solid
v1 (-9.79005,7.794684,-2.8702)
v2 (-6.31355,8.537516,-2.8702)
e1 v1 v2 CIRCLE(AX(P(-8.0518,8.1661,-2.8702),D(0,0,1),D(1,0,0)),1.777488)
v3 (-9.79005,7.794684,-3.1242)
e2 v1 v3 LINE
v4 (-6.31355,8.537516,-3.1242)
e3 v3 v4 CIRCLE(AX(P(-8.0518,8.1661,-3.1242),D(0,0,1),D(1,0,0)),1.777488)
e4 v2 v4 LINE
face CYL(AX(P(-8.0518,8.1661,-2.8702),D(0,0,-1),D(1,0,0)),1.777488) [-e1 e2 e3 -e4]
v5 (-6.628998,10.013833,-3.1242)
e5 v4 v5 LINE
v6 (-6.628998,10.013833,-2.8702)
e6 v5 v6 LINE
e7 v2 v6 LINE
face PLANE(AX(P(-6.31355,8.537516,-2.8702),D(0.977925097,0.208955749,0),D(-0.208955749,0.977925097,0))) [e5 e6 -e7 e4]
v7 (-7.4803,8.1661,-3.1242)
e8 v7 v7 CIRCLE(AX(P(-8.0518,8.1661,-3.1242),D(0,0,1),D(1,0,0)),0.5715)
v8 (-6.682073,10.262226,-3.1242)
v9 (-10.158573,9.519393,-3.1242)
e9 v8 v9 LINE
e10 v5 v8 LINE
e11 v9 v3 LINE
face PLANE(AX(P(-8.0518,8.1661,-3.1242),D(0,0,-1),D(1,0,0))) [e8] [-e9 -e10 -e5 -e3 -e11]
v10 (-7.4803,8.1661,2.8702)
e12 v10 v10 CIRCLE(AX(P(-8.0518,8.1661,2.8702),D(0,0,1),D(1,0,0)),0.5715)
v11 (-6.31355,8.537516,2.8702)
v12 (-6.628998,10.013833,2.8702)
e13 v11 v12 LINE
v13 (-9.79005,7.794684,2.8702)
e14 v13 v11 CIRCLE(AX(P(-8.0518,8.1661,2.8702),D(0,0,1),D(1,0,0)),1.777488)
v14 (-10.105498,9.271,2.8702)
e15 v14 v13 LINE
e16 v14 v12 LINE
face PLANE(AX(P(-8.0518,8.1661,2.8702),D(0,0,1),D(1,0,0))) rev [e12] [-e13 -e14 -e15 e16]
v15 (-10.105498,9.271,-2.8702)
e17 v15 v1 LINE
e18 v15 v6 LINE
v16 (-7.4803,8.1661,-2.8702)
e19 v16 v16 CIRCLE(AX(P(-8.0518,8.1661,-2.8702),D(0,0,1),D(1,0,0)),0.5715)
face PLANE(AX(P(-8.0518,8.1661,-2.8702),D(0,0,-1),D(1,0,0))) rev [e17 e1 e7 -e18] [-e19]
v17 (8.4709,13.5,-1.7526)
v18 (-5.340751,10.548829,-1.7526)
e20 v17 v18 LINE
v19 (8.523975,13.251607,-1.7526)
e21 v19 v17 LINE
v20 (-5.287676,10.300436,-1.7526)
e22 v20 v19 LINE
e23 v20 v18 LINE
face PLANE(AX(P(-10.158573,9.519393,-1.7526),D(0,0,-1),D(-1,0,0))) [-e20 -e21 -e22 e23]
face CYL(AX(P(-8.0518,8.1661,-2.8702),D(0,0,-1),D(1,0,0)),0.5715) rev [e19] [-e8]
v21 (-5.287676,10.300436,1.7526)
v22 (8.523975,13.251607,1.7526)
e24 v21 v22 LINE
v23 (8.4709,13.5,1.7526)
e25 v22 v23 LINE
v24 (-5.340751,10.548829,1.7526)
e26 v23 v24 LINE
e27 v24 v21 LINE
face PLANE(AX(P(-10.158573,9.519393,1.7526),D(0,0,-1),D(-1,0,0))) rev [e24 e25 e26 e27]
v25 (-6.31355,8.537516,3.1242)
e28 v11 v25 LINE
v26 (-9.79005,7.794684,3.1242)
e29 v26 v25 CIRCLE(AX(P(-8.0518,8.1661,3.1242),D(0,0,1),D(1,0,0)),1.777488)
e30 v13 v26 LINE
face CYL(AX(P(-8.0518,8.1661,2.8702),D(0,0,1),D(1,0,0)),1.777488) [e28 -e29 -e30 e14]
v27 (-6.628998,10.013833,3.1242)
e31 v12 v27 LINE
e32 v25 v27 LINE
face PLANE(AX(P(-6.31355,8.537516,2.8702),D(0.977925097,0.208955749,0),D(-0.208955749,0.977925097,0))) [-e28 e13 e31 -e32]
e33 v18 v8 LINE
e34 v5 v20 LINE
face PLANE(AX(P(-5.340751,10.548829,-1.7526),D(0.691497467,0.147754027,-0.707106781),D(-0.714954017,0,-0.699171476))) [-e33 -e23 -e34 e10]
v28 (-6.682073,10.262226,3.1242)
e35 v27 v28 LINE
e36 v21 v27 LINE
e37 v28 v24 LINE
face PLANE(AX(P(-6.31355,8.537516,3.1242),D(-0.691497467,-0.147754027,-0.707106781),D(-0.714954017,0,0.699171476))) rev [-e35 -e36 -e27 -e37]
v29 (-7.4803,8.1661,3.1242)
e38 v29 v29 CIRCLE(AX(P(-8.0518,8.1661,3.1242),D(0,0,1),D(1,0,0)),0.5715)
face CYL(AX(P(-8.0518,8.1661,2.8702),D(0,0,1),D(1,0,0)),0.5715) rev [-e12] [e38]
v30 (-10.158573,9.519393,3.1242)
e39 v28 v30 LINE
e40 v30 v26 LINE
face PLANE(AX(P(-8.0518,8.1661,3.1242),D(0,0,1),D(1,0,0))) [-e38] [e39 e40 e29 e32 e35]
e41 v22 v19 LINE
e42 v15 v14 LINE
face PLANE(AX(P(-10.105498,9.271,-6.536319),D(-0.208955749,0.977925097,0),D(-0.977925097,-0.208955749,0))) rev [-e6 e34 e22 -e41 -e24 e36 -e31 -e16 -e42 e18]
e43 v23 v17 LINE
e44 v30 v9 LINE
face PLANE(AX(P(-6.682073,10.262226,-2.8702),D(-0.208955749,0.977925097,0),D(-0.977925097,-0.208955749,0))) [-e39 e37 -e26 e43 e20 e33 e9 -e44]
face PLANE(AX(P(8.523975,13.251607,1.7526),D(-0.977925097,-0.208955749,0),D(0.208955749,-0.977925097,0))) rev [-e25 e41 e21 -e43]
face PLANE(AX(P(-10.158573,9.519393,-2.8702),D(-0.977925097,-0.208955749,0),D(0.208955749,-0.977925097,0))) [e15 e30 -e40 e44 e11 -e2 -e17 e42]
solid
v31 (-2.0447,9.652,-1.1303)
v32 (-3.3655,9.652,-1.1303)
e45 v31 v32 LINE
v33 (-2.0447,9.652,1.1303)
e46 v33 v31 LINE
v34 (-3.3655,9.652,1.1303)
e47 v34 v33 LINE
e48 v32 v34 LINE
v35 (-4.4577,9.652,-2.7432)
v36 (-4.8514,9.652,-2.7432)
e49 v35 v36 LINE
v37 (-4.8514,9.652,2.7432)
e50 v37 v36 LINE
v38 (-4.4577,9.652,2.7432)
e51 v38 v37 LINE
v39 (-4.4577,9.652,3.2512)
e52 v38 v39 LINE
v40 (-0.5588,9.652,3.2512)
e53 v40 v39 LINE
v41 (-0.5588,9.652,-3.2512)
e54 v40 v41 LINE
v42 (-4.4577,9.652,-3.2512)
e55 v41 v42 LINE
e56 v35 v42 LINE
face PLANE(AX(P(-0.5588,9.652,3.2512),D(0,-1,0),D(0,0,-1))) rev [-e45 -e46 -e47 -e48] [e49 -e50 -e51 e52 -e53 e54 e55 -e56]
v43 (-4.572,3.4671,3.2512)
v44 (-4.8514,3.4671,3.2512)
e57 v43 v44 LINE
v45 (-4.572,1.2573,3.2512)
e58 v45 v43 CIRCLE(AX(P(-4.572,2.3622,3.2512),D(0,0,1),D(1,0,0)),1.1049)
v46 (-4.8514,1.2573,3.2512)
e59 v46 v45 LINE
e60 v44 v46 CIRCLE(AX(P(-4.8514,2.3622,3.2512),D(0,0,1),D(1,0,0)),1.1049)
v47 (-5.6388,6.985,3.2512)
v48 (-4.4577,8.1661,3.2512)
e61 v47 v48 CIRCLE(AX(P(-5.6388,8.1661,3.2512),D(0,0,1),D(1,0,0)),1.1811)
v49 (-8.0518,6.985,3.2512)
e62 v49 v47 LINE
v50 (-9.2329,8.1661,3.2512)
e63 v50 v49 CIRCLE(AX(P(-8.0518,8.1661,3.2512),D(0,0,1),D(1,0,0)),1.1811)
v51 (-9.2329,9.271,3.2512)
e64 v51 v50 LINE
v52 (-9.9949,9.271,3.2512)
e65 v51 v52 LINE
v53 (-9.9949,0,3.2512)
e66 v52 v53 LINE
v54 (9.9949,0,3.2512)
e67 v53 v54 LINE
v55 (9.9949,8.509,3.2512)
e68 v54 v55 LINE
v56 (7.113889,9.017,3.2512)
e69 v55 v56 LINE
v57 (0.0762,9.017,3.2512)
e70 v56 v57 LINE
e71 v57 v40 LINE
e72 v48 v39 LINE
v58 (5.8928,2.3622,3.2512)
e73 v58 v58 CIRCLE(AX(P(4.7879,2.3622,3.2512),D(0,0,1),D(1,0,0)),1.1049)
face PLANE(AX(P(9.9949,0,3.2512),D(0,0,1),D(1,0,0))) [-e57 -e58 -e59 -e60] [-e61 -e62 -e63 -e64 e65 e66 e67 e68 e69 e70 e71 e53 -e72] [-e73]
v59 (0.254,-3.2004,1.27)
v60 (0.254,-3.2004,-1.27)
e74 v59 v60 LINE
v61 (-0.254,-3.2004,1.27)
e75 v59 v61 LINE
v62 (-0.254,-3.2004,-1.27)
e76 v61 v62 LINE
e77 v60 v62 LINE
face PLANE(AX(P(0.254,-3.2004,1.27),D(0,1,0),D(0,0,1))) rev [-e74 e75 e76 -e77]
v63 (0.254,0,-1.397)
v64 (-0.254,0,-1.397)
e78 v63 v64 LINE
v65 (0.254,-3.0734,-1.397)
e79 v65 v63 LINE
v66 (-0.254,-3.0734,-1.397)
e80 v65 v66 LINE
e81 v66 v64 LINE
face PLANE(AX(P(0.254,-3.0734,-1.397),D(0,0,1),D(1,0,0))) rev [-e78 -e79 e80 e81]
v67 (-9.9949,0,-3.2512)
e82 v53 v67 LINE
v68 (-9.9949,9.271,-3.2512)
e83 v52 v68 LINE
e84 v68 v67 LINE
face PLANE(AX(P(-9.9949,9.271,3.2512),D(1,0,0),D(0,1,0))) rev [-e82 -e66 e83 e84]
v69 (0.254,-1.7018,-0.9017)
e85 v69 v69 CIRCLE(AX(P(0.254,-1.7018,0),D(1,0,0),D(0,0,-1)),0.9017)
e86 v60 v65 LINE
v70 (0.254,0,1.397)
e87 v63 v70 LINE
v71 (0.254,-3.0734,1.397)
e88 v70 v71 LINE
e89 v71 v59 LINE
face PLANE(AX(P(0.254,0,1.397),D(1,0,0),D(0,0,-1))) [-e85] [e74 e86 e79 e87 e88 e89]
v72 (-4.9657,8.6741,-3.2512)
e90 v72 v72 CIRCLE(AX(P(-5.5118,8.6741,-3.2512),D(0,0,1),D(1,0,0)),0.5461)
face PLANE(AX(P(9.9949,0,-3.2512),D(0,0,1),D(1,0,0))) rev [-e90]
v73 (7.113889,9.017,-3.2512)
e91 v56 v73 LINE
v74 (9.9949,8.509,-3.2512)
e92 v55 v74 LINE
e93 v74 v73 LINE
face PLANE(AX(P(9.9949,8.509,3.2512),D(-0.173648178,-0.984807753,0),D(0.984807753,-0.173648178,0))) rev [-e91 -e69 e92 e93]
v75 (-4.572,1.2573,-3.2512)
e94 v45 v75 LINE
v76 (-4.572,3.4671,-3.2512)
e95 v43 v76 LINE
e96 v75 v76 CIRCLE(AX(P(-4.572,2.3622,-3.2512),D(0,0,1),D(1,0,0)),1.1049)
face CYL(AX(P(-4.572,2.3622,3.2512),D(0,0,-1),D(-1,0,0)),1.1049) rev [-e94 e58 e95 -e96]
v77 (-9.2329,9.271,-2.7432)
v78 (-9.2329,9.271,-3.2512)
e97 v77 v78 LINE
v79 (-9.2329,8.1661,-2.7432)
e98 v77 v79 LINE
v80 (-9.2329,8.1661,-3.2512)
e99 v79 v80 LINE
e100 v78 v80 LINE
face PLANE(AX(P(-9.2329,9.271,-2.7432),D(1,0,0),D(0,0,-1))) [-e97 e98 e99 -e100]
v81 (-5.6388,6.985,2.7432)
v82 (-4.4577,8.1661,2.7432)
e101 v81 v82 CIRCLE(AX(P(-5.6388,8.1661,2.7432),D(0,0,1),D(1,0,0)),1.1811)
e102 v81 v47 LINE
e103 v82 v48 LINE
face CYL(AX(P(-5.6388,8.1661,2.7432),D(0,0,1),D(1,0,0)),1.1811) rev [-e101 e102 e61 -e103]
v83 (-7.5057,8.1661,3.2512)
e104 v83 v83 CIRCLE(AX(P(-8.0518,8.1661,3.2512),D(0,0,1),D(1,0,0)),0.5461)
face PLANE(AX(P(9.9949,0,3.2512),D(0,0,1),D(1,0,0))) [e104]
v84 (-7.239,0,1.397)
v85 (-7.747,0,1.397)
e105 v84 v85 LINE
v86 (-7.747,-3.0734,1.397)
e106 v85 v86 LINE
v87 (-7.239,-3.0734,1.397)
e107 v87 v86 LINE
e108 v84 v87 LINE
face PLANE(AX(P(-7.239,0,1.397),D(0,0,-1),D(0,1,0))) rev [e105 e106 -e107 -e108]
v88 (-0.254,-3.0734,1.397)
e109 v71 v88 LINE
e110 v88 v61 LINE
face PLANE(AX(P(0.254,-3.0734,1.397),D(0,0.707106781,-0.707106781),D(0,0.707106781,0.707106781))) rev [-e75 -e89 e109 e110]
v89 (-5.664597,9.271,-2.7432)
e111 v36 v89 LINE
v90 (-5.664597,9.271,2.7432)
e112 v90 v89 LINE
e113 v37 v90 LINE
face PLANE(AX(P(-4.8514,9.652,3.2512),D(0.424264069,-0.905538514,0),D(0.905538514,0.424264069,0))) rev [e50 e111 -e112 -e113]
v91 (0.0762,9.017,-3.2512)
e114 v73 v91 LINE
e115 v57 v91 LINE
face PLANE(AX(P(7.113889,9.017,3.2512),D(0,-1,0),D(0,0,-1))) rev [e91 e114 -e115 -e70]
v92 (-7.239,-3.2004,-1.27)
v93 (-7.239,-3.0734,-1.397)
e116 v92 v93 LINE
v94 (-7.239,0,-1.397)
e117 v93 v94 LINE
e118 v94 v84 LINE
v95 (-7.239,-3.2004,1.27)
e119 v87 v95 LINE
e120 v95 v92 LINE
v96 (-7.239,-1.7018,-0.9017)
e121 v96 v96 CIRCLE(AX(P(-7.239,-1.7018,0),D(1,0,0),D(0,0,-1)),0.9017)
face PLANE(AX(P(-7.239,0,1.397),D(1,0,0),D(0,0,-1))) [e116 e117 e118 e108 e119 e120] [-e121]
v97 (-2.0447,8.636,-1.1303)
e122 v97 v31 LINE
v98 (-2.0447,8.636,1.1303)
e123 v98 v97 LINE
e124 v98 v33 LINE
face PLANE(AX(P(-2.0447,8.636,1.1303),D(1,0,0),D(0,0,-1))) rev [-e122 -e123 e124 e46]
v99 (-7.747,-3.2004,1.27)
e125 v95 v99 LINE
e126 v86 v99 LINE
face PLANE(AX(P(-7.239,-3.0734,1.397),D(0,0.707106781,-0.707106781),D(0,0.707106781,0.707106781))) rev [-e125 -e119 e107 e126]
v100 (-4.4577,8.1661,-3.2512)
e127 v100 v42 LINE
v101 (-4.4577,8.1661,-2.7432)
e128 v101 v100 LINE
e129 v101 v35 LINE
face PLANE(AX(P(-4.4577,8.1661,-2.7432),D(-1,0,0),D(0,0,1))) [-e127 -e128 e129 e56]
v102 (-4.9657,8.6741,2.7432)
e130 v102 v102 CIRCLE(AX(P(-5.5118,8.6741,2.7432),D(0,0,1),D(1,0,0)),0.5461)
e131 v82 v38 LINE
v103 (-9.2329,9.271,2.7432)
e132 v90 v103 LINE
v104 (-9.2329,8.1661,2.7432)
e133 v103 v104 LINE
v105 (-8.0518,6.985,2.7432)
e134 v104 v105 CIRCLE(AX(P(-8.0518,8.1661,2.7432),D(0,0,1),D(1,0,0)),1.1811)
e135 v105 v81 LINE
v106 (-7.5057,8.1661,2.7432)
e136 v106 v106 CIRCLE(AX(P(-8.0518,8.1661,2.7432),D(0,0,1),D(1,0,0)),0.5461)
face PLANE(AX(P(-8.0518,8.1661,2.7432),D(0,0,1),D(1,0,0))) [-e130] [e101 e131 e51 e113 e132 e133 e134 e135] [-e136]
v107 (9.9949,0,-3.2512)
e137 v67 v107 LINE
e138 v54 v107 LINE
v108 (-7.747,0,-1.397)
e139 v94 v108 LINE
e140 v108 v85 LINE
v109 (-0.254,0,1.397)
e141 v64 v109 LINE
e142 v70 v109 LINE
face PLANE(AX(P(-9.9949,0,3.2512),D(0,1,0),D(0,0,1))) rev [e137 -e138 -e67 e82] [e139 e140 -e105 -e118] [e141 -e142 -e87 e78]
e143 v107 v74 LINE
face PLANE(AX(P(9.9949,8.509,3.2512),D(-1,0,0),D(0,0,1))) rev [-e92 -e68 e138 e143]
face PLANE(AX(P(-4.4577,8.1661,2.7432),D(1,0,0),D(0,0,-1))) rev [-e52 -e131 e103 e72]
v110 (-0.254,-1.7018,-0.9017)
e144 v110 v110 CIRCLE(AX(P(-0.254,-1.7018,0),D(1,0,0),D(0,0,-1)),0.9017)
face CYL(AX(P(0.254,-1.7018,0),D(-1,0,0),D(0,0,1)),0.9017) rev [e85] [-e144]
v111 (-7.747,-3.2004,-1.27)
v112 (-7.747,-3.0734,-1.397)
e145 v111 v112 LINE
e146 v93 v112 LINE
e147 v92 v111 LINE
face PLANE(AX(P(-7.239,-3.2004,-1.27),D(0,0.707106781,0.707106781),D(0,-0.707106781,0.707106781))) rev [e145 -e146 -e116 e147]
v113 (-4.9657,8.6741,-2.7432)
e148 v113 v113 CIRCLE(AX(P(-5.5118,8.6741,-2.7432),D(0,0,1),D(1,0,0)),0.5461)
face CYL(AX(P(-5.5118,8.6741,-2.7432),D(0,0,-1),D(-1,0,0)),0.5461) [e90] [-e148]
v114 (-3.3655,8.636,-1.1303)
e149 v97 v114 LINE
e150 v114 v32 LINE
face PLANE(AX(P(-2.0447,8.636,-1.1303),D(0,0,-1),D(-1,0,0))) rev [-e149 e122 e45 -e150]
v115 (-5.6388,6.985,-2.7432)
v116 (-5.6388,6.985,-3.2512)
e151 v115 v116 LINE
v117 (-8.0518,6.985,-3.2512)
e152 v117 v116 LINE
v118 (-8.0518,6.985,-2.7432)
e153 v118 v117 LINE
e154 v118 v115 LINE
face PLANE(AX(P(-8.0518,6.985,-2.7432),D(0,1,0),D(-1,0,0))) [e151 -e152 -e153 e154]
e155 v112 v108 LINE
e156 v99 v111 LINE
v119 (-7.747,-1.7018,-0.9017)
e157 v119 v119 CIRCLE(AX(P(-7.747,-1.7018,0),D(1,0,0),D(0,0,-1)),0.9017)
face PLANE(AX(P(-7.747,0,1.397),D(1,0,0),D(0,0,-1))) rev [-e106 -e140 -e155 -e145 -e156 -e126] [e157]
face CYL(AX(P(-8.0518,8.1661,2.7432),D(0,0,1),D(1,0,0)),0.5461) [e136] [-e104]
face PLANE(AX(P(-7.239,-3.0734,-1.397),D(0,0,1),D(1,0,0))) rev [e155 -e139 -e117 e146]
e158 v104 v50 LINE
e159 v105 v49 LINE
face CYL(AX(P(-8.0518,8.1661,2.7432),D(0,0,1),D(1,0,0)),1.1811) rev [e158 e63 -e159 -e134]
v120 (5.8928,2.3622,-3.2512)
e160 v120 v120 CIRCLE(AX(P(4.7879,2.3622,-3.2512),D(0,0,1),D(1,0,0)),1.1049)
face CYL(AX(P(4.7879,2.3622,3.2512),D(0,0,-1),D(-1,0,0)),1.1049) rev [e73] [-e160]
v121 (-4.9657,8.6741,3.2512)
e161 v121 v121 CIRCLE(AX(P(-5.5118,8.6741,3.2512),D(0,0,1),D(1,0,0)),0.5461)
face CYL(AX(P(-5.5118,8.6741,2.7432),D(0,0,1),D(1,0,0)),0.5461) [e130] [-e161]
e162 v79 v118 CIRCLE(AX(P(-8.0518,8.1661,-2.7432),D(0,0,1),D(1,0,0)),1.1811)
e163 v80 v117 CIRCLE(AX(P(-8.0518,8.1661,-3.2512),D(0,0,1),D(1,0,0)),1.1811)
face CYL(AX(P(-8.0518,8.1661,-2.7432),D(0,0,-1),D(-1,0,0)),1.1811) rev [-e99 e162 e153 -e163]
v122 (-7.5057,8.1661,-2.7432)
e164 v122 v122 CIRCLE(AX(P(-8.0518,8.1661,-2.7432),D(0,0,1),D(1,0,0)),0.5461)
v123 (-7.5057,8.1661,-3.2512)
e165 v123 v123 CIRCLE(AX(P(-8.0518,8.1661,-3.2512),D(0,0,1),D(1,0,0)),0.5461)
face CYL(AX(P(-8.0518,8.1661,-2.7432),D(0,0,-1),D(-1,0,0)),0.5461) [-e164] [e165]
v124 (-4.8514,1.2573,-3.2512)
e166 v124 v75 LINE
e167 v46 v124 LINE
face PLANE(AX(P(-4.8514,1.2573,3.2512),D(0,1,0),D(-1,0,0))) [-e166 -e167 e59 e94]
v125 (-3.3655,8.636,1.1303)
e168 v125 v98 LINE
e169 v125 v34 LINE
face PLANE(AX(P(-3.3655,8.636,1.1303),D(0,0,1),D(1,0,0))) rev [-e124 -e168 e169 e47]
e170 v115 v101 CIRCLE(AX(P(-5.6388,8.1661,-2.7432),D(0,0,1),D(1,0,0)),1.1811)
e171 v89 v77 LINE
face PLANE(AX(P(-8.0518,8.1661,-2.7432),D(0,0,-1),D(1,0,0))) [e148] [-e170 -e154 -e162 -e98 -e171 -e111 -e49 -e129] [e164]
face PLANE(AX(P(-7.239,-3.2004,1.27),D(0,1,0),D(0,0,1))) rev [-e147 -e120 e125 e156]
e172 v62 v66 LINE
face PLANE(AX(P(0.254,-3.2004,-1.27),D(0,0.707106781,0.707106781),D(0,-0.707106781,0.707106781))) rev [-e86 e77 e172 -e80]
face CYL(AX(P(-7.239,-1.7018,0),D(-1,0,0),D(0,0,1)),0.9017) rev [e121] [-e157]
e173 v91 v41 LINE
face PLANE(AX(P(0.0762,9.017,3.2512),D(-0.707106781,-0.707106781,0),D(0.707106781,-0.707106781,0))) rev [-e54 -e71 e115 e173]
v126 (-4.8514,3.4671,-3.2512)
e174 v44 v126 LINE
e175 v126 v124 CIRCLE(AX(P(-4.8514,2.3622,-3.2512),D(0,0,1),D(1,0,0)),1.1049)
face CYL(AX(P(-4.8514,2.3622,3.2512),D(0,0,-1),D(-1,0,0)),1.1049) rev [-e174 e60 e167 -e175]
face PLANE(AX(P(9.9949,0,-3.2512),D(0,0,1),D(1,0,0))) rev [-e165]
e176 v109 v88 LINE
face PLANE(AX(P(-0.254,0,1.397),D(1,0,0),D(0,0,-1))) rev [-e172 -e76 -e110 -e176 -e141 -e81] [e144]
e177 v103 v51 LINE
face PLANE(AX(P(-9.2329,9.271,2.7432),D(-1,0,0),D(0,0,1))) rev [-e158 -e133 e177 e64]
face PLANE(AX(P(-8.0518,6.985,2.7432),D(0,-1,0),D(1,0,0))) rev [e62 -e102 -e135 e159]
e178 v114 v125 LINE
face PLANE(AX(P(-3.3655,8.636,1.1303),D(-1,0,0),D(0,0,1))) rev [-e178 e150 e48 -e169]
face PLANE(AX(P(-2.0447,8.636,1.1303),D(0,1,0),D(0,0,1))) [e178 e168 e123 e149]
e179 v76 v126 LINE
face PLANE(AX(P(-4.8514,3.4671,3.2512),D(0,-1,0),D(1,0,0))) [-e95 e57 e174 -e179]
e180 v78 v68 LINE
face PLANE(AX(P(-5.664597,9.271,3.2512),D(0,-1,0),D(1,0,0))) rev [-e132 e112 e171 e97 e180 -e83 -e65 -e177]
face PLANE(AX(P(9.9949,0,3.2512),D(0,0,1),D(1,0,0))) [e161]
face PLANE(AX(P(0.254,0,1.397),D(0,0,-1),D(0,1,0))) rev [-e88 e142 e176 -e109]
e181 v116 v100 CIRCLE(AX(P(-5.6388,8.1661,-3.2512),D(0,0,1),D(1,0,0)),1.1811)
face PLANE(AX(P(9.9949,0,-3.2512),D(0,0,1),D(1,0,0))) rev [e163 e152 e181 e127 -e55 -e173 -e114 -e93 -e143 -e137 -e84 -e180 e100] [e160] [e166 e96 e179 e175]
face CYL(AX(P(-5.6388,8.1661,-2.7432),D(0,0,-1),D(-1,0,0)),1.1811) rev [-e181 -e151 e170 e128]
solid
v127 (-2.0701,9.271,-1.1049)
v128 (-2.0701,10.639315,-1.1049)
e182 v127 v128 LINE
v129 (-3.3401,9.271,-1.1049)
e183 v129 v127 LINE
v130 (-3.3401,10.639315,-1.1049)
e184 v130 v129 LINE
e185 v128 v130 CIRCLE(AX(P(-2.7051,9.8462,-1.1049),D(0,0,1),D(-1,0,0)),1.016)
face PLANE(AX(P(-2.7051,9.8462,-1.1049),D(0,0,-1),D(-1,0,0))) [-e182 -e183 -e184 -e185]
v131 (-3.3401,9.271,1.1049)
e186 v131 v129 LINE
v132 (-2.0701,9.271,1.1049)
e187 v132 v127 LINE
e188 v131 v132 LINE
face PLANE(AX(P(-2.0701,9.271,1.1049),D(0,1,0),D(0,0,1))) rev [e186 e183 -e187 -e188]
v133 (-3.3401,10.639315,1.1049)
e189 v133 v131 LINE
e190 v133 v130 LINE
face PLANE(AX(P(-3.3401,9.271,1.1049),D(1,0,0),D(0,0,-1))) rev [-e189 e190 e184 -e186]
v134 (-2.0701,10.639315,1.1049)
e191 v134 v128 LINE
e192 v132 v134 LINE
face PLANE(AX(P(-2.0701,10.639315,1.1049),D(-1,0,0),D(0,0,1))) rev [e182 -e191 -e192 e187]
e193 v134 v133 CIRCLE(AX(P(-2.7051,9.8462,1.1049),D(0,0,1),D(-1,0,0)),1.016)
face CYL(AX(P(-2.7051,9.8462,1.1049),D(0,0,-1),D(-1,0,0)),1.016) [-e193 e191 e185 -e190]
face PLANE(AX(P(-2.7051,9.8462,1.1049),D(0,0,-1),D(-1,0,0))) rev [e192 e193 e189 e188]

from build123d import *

# Parameters (mm, degrees)
SKETCH2_R          = 1.1049
EXTRUDE1_DEPTH     = 3.2512
EXTRUDE2_DEPTH     = 1.1049
SKETCH4_W          = 1.3208
SKETCH4_H          = 2.2606
CUT_EXTRUDE1_DEPTH = 1.016
SKETCH5_R          = 0.5461
CUT_EXTRUDE2_DEPTH = 0.508
SKETCH10_R         = 0.9017
EXTRUDE6_DEPTH     = 0.254
LPATTERN1_COUNT    = 2
LPATTERN1_PITCH    = 7.493
EXTRUDE3_DEPTH     = 1.7526
EXTRUDE4_START     = -0.127
SKETCH8_R          = 0.5715
EXTRUDE4_DEPTH     = 0.254
EXTRUDE5_DEPTH     = 1.1176


with BuildPart() as part:
    # Sketch2 → Extrude1 (new, symmetric)
    with BuildSketch(Plane.XY):
        Polygon((9.9949, 8.509), (7.113888836, 9.017), (0.0762, 9.017), (-0.5588, 9.652), (-4.8514, 9.652), (-5.664596778, 9.271), (-9.9949, 9.271), (-9.9949, 0), (9.9949, 0), align=None)
        with Locations((4.7879, 2.3622)):
            Circle(SKETCH2_R, mode=Mode.SUBTRACT)
        with BuildLine():
            Line((-4.8514, 3.4671), (-4.572, 3.4671))
            ThreePointArc((-4.572, 3.4671), (-3.4671, 2.3622), (-4.572, 1.2573))
            Line((-4.572, 1.2573), (-4.8514, 1.2573))
            ThreePointArc((-4.8514, 1.2573), (-5.9563, 2.3622), (-4.8514, 3.4671))
        make_face(mode=Mode.SUBTRACT)
    extrude(amount=EXTRUDE1_DEPTH, both=True)

    # Sketch4 → Cut-Extrude1 (cut)
    with BuildSketch(Plane(origin=(0, 9.652, 0), x_dir=(-1, 0, 0), z_dir=(0, 1, 0))):
        with Locations((2.7051, 0)):
            Rectangle(SKETCH4_W, SKETCH4_H)
    extrude(amount=-CUT_EXTRUDE1_DEPTH, mode=Mode.SUBTRACT)

    # Sketch5 → Cut-Extrude2 (cut)
    with BuildSketch(Plane.XY.offset(3.2512)):
        with BuildLine():
            Line((-9.2329, 9.271), (-9.2329, 8.1661))
            ThreePointArc((-9.2329, 8.1661), (-8.886963819, 7.330936181), (-8.0518, 6.985))
            Line((-8.0518, 6.985), (-5.6388, 6.985))
            ThreePointArc((-5.6388, 6.985), (-4.803636181, 7.330936181), (-4.4577, 8.1661))
            Line((-4.4577, 8.1661), (-4.4577, 9.652))
            Line((-4.4577, 9.652), (-4.8514, 9.652))
            Line((-4.8514, 9.652), (-5.664596778, 9.271))
            Line((-5.664596778, 9.271), (-9.2329, 9.271))
        make_face()
        with Locations((-5.5118, 8.6741)):
            Circle(SKETCH5_R, mode=Mode.SUBTRACT)
        with Locations((-8.0518, 8.1661)):
            Circle(SKETCH5_R, mode=Mode.SUBTRACT)
    cut_extrude2 = extrude(amount=-CUT_EXTRUDE2_DEPTH, mode=Mode.SUBTRACT)

    # Mirror1: Cut-Extrude2 across plane
    add(cut_extrude2.mirror(Plane.XY), mode=Mode.SUBTRACT)

    # Sketch10 → Extrude6 (add, symmetric)
    with BuildSketch(Plane(origin=(-7.493, 0, 0), x_dir=(0, 0, -1), z_dir=(1, 0, 0))):
        Polygon((-1.397, 0), (-1.397, -3.0734), (-1.27, -3.2004), (1.27, -3.2004), (1.397, -3.0734), (1.397, 0), align=None)
        with Locations((0, -1.7018)):
            Circle(SKETCH10_R, mode=Mode.SUBTRACT)
    extrude6 = extrude(amount=EXTRUDE6_DEPTH, both=True)

    # LPattern1: Extrude6 ×2
    with Locations(*[(i * LPATTERN1_PITCH, 0, 0) for i in range(1, LPATTERN1_COUNT)]):
        add(extrude6)


with BuildPart() as body_2:
    # Sketch3 → Extrude2 (new, symmetric)
    with BuildSketch(Plane.XY):
        with BuildLine():
            Line((-3.3401, 9.271), (-3.3401, 10.639314746))
            ThreePointArc((-3.3401, 10.639314746), (-2.7051, 10.8622), (-2.0701, 10.639314746))
            Line((-2.0701, 10.639314746), (-2.0701, 9.271))
            Line((-2.0701, 9.271), (-3.3401, 9.271))
        make_face()
    extrude(amount=EXTRUDE2_DEPTH, both=True)


with BuildPart() as body_3:
    # Sketch6 → Extrude3 (new, symmetric)
    with BuildSketch(Plane.XY):
        Polygon((-10.105498332, 9.271), (8.52397476, 13.251607025), (8.4709, 13.5), (-10.158573093, 9.519392975), align=None)
    extrude(amount=EXTRUDE3_DEPTH, both=True)


with BuildPart() as body_4:
    # Sketch8 → Extrude4 (new body)
    with BuildSketch(Plane.XY.offset(3.2512).offset(EXTRUDE4_START)):
        with BuildLine():
            Line((-6.313549941, 8.537516323), (-6.682072975, 10.262225621))
            Line((-6.682072975, 10.262225621), (-10.158573093, 9.519392975))
            Line((-10.158573093, 9.519392975), (-9.790050059, 7.794683677))
            ThreePointArc((-9.790050059, 7.794683677), (-7.680383677, 6.427849941), (-6.313549941, 8.537516323))
        make_face()
        with Locations((-8.0518, 8.1661)):
            Circle(SKETCH8_R, mode=Mode.SUBTRACT)
    extrude(amount=-EXTRUDE4_DEPTH)

    # Sketch9 → Extrude5 (add)
    with BuildSketch(Plane.XY.offset(1.7526)):
        Polygon((-6.628998215, 10.013832646), (-6.682072975, 10.262225621), (-10.158573093, 9.519392975), (-10.105498332, 9.271), align=None)
    extrude(amount=EXTRUDE5_DEPTH)


with BuildPart() as body_5:
    # Mirror7: mirrored copy
    add(body_4.part.mirror(Plane.XY))

    # Combine1: union body 3, body 4
    add(body_3.part)
    add(body_4.part)

    # Chamfer1
    # the kernel refuses this chamfer: 1.3716 mm, written as the material it adds along each edge
    with BuildSketch(Plane(origin=(-6.628998215, 10.013832646, -1.7526), x_dir=(-0.02688890779397689, -0.005745421501653921, -0.9996219169112968), z_dir=(-0.20895574936649164, 0.9779250967260673, 0))) as chamfer1_piece_1_section:
        with BuildLine():
            Line((1.410928155, 0), (-0.077560078, -1.408794766))
            Line((-0.077560078, -1.408794766), (-0.104981706, -1.408040499))
            ThreePointArc((-0.104981706, -1.408040499), (-0.046811648, -0.704176463), (-0.027421628, 0.000754267))
            Line((-0.027421628, 0.000754267), (0.000754267, 0.027421628))
            ThreePointArc((0.000754267, 0.027421628), (0.705684997, 0.008031609), (1.411682421, 0.027421628))
            Line((1.411682421, 0.027421628), (1.410928155, 0))
        make_face()
    chamfer1_piece_1 = extrude(amount=0.254, mode=Mode.PRIVATE)
    chamfer1_piece_1 = split(chamfer1_piece_1, bisect_by=Plane(origin=(-6.605283049, 10.148766723, -2.8702), z_dir=(0, 0, -1)), keep=Keep.TOP, mode=Mode.PRIVATE)
    chamfer1_piece_1 = split(chamfer1_piece_1, bisect_by=Plane(origin=(-6.605283049, 10.148766723, -3.1242), z_dir=(0, 0, 1)), keep=Keep.TOP, mode=Mode.PRIVATE)
    add(chamfer1_piece_1)
    with BuildSketch(Plane(origin=(-5.891944341, 6.564377516, -1.7526), x_dir=(-0.026888907793975552, -0.005745421501653636, -0.9996219169112968), z_dir=(-0.20895574936649164, 0.9779250967260673, 0))) as chamfer1_piece_2_section:
        with BuildLine():
            Line((1.410928155, 0), (-0.077560078, -1.408794766))
            Line((-0.077560078, -1.408794766), (-0.104981706, -1.408040499))
            ThreePointArc((-0.104981706, -1.408040499), (-0.046811648, -0.704176463), (-0.027421628, 0.000754267))
            Line((-0.027421628, 0.000754267), (0.000754267, 0.027421628))
            ThreePointArc((0.000754267, 0.027421628), (0.705684997, 0.008031609), (1.411682421, 0.027421628))
            Line((1.411682421, 0.027421628), (1.410928155, 0))
        make_face()
    chamfer1_piece_2 = extrude(amount=3.781320386, mode=Mode.PRIVATE)
    chamfer1_piece_2 = split(chamfer1_piece_2, bisect_by=Plane(origin=(-6.345522767, 8.530684608, -2.8702), z_dir=(0, 0, -1)), keep=Keep.TOP, mode=Mode.PRIVATE)
    chamfer1_piece_2 = split(chamfer1_piece_2, bisect_by=Plane(origin=(-6.345522767, 8.530684608, -3.1242), z_dir=(0, 0, 1)), keep=Keep.TOP, mode=Mode.PRIVATE)
    chamfer1_piece_2 = chamfer1_piece_2 & Plane(origin=(-8.0518, 8.1661, -3.007575957), x_dir=(-0.9779250967260683, -0.20895574936648695, 0), z_dir=(0, 0, -1)) * Cylinder(1.777487933, 14, mode=Mode.PRIVATE)
    add(chamfer1_piece_2)
    with BuildSketch(Plane(origin=(-6.628998215, 10.013832646, -1.7526), x_dir=(-0.02688890779397689, -0.005745421501653921, -0.9996219169112968), z_dir=(-0.20895574936649164, 0.9779250967260673, 0))) as chamfer1_piece_3_section:
        with BuildLine():
            Line((1.410928155, 0), (-0.077560078, -1.408794766))
            Line((-0.077560078, -1.408794766), (-0.104981706, -1.408040499))
            ThreePointArc((-0.104981706, -1.408040499), (-0.046811648, -0.704176463), (-0.027421628, 0.000754267))
            Line((-0.027421628, 0.000754267), (0.000754267, 0.027421628))
            ThreePointArc((0.000754267, 0.027421628), (0.705684997, 0.008031609), (1.411682421, 0.027421628))
            Line((1.411682421, 0.027421628), (1.410928155, 0))
        make_face()
    chamfer1_piece_3 = extrude(amount=0.254, mode=Mode.PRIVATE)
    chamfer1_piece_3 = split(chamfer1_piece_3, bisect_by=Plane(origin=(-6.194081793, 10.236629144, -2.8702), z_dir=(0, 0, 1)), keep=Keep.TOP, mode=Mode.PRIVATE)
    add(chamfer1_piece_3)
    with BuildSketch(Plane(origin=(-6.628998215, 10.013832646, 1.7526), x_dir=(-0.02688890779397689, -0.005745421501653921, 0.9996219169112968), z_dir=(-0.2089557493664916, 0.9779250967260672, 0))) as chamfer1_piece_4_section:
        with BuildLine():
            Line((1.410928155, 0), (-0.077560078, 1.408794766))
            Line((-0.077560078, 1.408794766), (-0.104981706, 1.408040499))
            ThreePointArc((-0.104981706, 1.408040499), (-0.046811648, 0.704176463), (-0.027421628, -0.000754267))
            Line((-0.027421628, -0.000754267), (0.000754267, -0.027421628))
            ThreePointArc((0.000754267, -0.027421628), (0.705684997, -0.008031609), (1.411682421, -0.027421628))
            Line((1.411682421, -0.027421628), (1.410928155, 0))
        make_face()
    chamfer1_piece_4 = extrude(amount=0.254, mode=Mode.PRIVATE)
    chamfer1_piece_4 = split(chamfer1_piece_4, bisect_by=Plane(origin=(-6.605283049, 10.148766723, 2.8702), z_dir=(0, 0, 1)), keep=Keep.TOP, mode=Mode.PRIVATE)
    chamfer1_piece_4 = split(chamfer1_piece_4, bisect_by=Plane(origin=(-6.605283049, 10.148766723, 3.1242), z_dir=(0, 0, -1)), keep=Keep.TOP, mode=Mode.PRIVATE)
    add(chamfer1_piece_4)
    with BuildSketch(Plane(origin=(-5.891944341, 6.564377516, 1.7526), x_dir=(-0.026888907793975552, -0.005745421501653634, 0.9996219169112968), z_dir=(-0.2089557493664916, 0.9779250967260672, 0))) as chamfer1_piece_5_section:
        with BuildLine():
            Line((1.410928155, 0), (-0.077560078, 1.408794766))
            Line((-0.077560078, 1.408794766), (-0.104981706, 1.408040499))
            ThreePointArc((-0.104981706, 1.408040499), (-0.046811648, 0.704176463), (-0.027421628, -0.000754267))
            Line((-0.027421628, -0.000754267), (0.000754267, -0.027421628))
            ThreePointArc((0.000754267, -0.027421628), (0.705684997, -0.008031609), (1.411682421, -0.027421628))
            Line((1.411682421, -0.027421628), (1.410928155, 0))
        make_face()
    chamfer1_piece_5 = extrude(amount=3.781320386, mode=Mode.PRIVATE)
    chamfer1_piece_5 = split(chamfer1_piece_5, bisect_by=Plane(origin=(-6.345522767, 8.530684608, 2.8702), z_dir=(0, 0, 1)), keep=Keep.TOP, mode=Mode.PRIVATE)
    chamfer1_piece_5 = chamfer1_piece_5 & Plane(origin=(-8.0518, 8.1661, 3.007575957), x_dir=(-0.9779250967260683, -0.20895574936648695, 0), z_dir=(0, 0, 1)) * Cylinder(1.777487933, 14, mode=Mode.PRIVATE)
    chamfer1_piece_5 = split(chamfer1_piece_5, bisect_by=Plane(origin=(-6.345522767, 8.530684608, 3.1242), z_dir=(0, 0, -1)), keep=Keep.TOP, mode=Mode.PRIVATE)
    add(chamfer1_piece_5)
    with BuildSketch(Plane(origin=(-6.628998215, 10.013832646, 1.7526), x_dir=(-0.02688890779397689, -0.005745421501653921, 0.9996219169112968), z_dir=(-0.2089557493664916, 0.9779250967260672, 0))) as chamfer1_piece_6_section:
        with BuildLine():
            Line((1.410928155, 0), (-0.077560078, 1.408794766))
            Line((-0.077560078, 1.408794766), (-0.104981706, 1.408040499))
            ThreePointArc((-0.104981706, 1.408040499), (-0.046811648, 0.704176463), (-0.027421628, -0.000754267))
            Line((-0.027421628, -0.000754267), (0.000754267, -0.027421628))
            ThreePointArc((0.000754267, -0.027421628), (0.705684997, -0.008031609), (1.411682421, -0.027421628))
            Line((1.411682421, -0.027421628), (1.410928155, 0))
        make_face()
    chamfer1_piece_6 = extrude(amount=0.254, mode=Mode.PRIVATE)
    chamfer1_piece_6 = split(chamfer1_piece_6, bisect_by=Plane(origin=(-6.194081793, 10.236629144, 2.8702), z_dir=(0, 0, -1)), keep=Keep.TOP, mode=Mode.PRIVATE)
    add(chamfer1_piece_6)


solid = Compound([part.part, body_2.part, body_5.part])
